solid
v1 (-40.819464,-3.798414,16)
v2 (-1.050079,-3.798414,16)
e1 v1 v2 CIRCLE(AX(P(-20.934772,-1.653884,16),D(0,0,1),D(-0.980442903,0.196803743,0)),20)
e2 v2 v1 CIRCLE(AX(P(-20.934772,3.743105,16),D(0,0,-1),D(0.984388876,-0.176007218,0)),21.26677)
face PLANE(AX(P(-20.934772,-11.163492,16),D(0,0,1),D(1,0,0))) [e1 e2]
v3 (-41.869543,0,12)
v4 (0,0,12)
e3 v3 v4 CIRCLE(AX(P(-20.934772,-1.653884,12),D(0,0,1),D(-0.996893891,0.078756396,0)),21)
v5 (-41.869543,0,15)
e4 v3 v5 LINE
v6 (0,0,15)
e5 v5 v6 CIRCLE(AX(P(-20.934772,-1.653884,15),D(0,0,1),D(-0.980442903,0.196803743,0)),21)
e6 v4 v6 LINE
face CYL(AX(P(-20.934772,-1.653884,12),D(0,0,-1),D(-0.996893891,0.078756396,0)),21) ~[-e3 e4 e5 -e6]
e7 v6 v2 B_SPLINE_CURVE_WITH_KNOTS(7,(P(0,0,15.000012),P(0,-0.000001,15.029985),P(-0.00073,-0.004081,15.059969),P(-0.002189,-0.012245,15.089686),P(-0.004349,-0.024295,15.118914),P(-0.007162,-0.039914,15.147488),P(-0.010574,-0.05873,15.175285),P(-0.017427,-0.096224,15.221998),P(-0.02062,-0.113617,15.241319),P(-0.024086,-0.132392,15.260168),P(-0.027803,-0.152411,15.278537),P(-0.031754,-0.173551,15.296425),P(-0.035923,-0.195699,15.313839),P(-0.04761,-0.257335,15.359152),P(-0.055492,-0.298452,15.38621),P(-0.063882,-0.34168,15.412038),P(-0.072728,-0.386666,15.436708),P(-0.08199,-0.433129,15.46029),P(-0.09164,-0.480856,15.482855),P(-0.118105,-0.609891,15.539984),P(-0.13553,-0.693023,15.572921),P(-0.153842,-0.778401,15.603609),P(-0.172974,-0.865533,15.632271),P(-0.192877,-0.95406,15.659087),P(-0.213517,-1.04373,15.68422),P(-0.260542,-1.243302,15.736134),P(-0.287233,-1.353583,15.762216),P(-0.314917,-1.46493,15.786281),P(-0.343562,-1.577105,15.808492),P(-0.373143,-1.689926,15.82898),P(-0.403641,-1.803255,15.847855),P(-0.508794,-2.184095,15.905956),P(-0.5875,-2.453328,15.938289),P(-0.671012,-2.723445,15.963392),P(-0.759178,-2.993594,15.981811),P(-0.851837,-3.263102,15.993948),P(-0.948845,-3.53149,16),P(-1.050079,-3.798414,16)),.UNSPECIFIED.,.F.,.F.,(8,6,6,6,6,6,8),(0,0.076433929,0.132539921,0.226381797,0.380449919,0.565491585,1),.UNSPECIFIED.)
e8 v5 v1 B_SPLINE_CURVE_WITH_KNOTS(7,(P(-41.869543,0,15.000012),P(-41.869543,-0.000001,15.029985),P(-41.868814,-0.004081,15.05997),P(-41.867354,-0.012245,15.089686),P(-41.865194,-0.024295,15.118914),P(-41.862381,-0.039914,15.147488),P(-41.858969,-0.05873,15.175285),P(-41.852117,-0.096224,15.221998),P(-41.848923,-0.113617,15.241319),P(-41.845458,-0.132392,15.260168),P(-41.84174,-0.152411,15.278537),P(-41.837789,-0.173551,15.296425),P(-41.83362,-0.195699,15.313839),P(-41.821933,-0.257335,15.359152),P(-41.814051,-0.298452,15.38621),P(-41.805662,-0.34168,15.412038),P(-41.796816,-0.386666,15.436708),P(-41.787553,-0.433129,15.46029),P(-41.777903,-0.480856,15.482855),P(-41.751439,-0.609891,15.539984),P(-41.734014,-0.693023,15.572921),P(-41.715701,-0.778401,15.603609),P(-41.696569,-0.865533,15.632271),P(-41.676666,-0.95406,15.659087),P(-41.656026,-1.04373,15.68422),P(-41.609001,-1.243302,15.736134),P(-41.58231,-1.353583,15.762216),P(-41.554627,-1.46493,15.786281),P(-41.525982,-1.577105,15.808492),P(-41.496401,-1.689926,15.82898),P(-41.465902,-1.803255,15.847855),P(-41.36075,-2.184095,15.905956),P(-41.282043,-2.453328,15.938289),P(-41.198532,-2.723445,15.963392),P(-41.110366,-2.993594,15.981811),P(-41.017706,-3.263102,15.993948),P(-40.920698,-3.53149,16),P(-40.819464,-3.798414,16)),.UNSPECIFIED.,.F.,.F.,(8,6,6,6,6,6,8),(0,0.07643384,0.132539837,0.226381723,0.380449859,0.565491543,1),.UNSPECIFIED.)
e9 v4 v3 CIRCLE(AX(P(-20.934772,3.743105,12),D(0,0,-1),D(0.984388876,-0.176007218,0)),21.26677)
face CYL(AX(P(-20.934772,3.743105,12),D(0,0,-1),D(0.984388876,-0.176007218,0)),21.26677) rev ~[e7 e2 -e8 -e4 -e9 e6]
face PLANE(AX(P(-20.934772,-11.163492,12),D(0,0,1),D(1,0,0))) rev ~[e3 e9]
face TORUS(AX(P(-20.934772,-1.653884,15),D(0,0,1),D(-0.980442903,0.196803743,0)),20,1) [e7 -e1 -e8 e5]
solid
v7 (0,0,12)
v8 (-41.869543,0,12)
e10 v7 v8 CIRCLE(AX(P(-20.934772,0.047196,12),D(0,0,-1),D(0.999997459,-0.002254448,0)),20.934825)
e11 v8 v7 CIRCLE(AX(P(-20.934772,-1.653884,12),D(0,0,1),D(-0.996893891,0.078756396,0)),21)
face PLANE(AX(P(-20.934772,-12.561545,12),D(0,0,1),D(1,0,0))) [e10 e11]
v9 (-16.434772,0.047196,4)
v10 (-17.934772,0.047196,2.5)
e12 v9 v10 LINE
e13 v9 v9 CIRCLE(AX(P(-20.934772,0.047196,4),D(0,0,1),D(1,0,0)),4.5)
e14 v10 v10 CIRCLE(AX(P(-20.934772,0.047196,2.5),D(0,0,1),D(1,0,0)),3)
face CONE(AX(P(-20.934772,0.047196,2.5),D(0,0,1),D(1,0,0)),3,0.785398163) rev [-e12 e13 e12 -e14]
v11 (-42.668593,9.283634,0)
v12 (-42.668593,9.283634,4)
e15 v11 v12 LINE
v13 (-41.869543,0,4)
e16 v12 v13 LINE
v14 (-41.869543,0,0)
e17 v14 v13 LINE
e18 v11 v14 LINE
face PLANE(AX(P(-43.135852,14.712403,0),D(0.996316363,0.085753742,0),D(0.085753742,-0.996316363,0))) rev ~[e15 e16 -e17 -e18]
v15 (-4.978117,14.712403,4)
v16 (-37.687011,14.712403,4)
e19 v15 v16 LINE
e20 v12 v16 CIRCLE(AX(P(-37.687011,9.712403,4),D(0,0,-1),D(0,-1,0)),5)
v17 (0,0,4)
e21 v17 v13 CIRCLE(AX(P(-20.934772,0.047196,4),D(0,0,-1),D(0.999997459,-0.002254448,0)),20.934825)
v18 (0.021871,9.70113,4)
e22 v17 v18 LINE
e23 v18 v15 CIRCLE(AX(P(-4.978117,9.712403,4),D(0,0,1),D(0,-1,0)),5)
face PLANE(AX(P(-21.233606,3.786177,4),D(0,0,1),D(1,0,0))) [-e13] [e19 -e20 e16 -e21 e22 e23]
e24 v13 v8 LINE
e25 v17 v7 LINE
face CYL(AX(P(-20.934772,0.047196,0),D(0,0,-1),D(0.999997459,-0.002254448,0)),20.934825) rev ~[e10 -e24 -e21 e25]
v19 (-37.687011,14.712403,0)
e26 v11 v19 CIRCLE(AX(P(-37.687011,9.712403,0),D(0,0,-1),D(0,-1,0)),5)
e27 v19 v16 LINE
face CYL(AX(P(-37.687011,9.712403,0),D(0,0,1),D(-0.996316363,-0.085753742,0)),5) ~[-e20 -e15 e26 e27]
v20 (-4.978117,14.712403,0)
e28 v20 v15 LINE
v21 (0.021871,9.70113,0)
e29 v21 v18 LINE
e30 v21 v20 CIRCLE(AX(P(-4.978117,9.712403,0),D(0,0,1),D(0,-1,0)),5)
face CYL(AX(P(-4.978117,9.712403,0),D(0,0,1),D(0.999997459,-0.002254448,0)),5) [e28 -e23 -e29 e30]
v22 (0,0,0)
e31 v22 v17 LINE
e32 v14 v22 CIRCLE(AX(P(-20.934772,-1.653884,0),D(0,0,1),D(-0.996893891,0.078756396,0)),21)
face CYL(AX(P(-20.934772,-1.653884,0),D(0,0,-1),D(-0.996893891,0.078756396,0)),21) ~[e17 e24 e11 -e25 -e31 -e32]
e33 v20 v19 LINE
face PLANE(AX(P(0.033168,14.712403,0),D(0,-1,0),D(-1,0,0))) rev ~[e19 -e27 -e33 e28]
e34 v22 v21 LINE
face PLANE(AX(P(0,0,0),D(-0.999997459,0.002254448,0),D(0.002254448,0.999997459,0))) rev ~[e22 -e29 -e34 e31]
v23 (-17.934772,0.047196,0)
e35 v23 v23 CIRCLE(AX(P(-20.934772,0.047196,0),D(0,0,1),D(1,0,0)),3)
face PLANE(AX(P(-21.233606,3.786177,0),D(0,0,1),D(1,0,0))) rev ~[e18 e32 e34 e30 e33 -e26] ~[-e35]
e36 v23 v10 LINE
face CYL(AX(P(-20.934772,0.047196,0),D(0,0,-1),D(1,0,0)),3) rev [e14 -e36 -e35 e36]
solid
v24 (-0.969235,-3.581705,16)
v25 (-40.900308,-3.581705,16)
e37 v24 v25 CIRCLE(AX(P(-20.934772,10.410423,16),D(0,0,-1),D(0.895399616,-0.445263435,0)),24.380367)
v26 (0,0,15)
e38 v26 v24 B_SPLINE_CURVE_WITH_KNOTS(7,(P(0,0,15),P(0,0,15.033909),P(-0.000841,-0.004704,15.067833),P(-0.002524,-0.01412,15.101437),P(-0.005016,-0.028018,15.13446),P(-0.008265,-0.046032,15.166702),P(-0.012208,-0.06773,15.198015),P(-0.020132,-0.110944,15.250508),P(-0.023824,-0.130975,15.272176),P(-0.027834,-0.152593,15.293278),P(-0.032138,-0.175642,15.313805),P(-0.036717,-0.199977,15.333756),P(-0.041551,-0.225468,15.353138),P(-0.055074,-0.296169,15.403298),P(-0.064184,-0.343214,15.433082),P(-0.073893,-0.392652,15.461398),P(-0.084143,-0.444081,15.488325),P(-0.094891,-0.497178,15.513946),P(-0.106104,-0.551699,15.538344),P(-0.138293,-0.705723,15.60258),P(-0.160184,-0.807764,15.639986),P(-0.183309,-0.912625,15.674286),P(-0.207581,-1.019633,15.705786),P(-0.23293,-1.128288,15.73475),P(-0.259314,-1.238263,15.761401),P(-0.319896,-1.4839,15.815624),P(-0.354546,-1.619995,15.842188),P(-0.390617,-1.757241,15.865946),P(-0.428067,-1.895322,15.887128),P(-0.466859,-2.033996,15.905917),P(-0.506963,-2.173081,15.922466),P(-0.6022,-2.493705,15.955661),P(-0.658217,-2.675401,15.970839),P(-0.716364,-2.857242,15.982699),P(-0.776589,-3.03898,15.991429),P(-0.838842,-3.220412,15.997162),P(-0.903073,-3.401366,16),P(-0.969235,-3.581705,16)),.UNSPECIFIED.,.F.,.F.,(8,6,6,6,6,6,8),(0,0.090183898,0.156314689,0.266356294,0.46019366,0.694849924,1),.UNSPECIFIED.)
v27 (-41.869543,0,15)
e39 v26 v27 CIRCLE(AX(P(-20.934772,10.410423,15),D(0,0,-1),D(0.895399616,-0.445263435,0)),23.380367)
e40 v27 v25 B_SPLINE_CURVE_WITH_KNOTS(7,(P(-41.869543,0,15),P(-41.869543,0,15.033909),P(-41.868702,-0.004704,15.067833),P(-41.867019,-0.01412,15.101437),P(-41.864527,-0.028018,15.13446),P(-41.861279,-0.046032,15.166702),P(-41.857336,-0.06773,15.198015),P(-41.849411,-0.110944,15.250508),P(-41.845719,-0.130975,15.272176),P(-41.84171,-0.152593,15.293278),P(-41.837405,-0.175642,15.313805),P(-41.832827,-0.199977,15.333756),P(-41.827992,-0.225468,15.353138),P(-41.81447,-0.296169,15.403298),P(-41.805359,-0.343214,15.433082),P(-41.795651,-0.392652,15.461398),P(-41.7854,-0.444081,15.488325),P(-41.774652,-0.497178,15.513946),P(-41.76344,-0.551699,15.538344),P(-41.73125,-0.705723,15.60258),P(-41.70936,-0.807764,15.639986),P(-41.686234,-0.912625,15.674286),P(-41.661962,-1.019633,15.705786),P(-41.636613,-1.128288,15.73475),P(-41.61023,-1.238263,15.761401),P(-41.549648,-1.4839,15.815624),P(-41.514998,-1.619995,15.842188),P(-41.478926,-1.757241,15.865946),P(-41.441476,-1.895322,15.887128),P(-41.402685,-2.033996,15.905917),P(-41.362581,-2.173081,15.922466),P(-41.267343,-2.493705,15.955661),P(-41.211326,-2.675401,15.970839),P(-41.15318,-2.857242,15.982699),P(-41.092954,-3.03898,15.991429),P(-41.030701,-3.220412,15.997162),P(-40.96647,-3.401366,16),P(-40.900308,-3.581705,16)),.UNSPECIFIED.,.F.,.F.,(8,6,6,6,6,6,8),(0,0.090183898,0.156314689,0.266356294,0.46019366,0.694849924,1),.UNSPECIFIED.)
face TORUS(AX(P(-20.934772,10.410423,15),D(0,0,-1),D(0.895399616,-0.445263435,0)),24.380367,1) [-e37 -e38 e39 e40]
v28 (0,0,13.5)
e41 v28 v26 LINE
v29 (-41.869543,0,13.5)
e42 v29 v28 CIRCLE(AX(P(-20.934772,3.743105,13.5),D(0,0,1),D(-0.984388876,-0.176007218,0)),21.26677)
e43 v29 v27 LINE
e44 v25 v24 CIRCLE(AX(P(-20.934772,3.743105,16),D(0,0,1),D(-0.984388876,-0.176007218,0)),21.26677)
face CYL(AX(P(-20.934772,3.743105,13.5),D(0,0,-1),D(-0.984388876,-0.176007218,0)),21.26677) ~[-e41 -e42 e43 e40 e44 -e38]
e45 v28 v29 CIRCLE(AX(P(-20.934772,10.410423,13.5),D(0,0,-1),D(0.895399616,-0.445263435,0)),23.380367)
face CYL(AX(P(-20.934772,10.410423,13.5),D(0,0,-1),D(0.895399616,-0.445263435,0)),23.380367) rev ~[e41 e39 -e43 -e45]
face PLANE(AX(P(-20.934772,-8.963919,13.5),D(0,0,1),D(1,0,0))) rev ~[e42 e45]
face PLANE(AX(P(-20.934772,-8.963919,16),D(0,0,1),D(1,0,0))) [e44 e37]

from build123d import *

# Parameters (mm, degrees)
F0_R        = 3
F1_DEPTH    = 4
F2_DEPTH    = 12
F3_START    = 12
F3_DEPTH    = 4
F4_R        = 5
F5_START    = 13.5
F5_DEPTH    = 2.5
F6_T2_ANGLE = 202.7002250933
F7_R        = 1
F8_SIZE     = 1.5


# Not quite as in the source:
# - a fillet or chamfer that OpenCascade refuses, or shapes differently, is made with other operations: its cross-section is extruded or revolved along the edge and cut away or added


with BuildPart() as f1:
    # F0 (on Top) → F1 (new body)
    with BuildSketch(Plane.XY):
        with BuildLine():
            Line((-43.1358516216, 14.7124025971), (-41.8695434246, 0))
            ThreePointArc((-41.8695434246, 0), (-20.9347717123, -12.9699445096), (0, 0))
            Line((0, 0), (0.0331684333, 14.7124025971))
            Line((0.0331684333, 14.7124025971), (-43.1358516216, 14.7124025971))
        make_face()
        with Locations((-20.9347717123, 0.0471964775)):
            Circle(F0_R, mode=Mode.SUBTRACT)
        with BuildLine():
            ThreePointArc((0, 0), (-20.9347717123, -20.8876284359), (-41.8695434246, 0))
            ThreePointArc((-41.8695434246, 0), (-20.9347717123, -22.6538843228), (0, 0))
        make_face()
        with BuildLine():
            ThreePointArc((0, 0), (-20.9347717123, -17.5236648917), (-41.8695434246, 0))
            ThreePointArc((-41.8695434246, 0), (-20.9347717123, -20.8876284359), (0, 0))
        make_face()
        with BuildLine():
            ThreePointArc((0, 0), (-20.9347717123, -12.9699445096), (-41.8695434246, 0))
            ThreePointArc((-41.8695434246, 0), (-20.9347717123, -17.5236648917), (0, 0))
        make_face()
    extrude(amount=F1_DEPTH)

    # F0 (on Top) → F2 (join)
    with BuildSketch(Plane.XY):
        with BuildLine():
            ThreePointArc((0, 0), (-20.9347717123, -20.8876284359), (-41.8695434246, 0))
            ThreePointArc((-41.8695434246, 0), (-20.9347717123, -22.6538843228), (0, 0))
        make_face()
    extrude(amount=F2_DEPTH)

    # F4
    f4_edges = [f1.edges().sort_by_distance(p)[0] for p in [
        (0.033168, 14.712403, 2),
        (-43.135852, 14.712403, 2),
    ]]
    fillet(f4_edges, radius=F4_R)

    # F8
    f8_edges = [f1.edges().sort_by_distance(p)[0] for p in [
        (-23.934772, 0.047196, 4),
    ]]
    chamfer(f8_edges, length=F8_SIZE)


with BuildPart() as f3:
    # F0 (on Top) → F3 (new body)
    with BuildSketch(Plane.XY.offset(F3_START)):
        with BuildLine():
            ThreePointArc((0, 0), (-20.9347717123, -17.5236648917), (-41.8695434246, 0))
            ThreePointArc((-41.8695434246, 0), (-20.9347717123, -20.8876284359), (0, 0))
        make_face()
        with BuildLine():
            ThreePointArc((0, 0), (-20.9347717123, -20.8876284359), (-41.8695434246, 0))
            ThreePointArc((-41.8695434246, 0), (-20.9347717123, -22.6538843228), (0, 0))
        make_face()
    extrude(amount=F3_DEPTH)

    # F6: fillet of radius 1 on 1 edges, made by hand

    # F6_s1 → F6_t2 (revolve, cut)
    with BuildSketch(Plane(origin=(-1.1299645501, -5.6292919355, 0), x_dir=(0, 0, 1), z_dir=(0.1968037431, 0.9804429033, 0))):
        with BuildLine():
            ThreePointArc((15, -41.1998577327), (15.7071067812, -40.9069645139), (16, -40.1998577327))
            Line((16, -40.1998577327), (16, -41.1998577327))
            Line((16, -41.1998577327), (15, -41.1998577327))
        make_face()
    revolve(axis=Axis((-20.9347717123, -1.6538843228, 16), (0, 0, 1)), revolution_arc=F6_T2_ANGLE, mode=Mode.SUBTRACT)


with BuildPart() as f5:
    # F0 (on Top) → F5 (new body)
    with BuildSketch(Plane.XY.offset(F5_START)):
        with BuildLine():
            ThreePointArc((0, 0), (-20.9347717123, -12.9699445096), (-41.8695434246, 0))
            ThreePointArc((-41.8695434246, 0), (-20.9347717123, -17.5236648917), (0, 0))
        make_face()
    extrude(amount=F5_DEPTH)

    # F7
    f7_edges = [f5.edges().sort_by_distance(p)[0] for p in [
        (-20.934772, -12.969945, 16),
    ]]
    fillet(f7_edges, radius=F7_R)


solid = Compound([f1.part, f3.part, f5.part])
